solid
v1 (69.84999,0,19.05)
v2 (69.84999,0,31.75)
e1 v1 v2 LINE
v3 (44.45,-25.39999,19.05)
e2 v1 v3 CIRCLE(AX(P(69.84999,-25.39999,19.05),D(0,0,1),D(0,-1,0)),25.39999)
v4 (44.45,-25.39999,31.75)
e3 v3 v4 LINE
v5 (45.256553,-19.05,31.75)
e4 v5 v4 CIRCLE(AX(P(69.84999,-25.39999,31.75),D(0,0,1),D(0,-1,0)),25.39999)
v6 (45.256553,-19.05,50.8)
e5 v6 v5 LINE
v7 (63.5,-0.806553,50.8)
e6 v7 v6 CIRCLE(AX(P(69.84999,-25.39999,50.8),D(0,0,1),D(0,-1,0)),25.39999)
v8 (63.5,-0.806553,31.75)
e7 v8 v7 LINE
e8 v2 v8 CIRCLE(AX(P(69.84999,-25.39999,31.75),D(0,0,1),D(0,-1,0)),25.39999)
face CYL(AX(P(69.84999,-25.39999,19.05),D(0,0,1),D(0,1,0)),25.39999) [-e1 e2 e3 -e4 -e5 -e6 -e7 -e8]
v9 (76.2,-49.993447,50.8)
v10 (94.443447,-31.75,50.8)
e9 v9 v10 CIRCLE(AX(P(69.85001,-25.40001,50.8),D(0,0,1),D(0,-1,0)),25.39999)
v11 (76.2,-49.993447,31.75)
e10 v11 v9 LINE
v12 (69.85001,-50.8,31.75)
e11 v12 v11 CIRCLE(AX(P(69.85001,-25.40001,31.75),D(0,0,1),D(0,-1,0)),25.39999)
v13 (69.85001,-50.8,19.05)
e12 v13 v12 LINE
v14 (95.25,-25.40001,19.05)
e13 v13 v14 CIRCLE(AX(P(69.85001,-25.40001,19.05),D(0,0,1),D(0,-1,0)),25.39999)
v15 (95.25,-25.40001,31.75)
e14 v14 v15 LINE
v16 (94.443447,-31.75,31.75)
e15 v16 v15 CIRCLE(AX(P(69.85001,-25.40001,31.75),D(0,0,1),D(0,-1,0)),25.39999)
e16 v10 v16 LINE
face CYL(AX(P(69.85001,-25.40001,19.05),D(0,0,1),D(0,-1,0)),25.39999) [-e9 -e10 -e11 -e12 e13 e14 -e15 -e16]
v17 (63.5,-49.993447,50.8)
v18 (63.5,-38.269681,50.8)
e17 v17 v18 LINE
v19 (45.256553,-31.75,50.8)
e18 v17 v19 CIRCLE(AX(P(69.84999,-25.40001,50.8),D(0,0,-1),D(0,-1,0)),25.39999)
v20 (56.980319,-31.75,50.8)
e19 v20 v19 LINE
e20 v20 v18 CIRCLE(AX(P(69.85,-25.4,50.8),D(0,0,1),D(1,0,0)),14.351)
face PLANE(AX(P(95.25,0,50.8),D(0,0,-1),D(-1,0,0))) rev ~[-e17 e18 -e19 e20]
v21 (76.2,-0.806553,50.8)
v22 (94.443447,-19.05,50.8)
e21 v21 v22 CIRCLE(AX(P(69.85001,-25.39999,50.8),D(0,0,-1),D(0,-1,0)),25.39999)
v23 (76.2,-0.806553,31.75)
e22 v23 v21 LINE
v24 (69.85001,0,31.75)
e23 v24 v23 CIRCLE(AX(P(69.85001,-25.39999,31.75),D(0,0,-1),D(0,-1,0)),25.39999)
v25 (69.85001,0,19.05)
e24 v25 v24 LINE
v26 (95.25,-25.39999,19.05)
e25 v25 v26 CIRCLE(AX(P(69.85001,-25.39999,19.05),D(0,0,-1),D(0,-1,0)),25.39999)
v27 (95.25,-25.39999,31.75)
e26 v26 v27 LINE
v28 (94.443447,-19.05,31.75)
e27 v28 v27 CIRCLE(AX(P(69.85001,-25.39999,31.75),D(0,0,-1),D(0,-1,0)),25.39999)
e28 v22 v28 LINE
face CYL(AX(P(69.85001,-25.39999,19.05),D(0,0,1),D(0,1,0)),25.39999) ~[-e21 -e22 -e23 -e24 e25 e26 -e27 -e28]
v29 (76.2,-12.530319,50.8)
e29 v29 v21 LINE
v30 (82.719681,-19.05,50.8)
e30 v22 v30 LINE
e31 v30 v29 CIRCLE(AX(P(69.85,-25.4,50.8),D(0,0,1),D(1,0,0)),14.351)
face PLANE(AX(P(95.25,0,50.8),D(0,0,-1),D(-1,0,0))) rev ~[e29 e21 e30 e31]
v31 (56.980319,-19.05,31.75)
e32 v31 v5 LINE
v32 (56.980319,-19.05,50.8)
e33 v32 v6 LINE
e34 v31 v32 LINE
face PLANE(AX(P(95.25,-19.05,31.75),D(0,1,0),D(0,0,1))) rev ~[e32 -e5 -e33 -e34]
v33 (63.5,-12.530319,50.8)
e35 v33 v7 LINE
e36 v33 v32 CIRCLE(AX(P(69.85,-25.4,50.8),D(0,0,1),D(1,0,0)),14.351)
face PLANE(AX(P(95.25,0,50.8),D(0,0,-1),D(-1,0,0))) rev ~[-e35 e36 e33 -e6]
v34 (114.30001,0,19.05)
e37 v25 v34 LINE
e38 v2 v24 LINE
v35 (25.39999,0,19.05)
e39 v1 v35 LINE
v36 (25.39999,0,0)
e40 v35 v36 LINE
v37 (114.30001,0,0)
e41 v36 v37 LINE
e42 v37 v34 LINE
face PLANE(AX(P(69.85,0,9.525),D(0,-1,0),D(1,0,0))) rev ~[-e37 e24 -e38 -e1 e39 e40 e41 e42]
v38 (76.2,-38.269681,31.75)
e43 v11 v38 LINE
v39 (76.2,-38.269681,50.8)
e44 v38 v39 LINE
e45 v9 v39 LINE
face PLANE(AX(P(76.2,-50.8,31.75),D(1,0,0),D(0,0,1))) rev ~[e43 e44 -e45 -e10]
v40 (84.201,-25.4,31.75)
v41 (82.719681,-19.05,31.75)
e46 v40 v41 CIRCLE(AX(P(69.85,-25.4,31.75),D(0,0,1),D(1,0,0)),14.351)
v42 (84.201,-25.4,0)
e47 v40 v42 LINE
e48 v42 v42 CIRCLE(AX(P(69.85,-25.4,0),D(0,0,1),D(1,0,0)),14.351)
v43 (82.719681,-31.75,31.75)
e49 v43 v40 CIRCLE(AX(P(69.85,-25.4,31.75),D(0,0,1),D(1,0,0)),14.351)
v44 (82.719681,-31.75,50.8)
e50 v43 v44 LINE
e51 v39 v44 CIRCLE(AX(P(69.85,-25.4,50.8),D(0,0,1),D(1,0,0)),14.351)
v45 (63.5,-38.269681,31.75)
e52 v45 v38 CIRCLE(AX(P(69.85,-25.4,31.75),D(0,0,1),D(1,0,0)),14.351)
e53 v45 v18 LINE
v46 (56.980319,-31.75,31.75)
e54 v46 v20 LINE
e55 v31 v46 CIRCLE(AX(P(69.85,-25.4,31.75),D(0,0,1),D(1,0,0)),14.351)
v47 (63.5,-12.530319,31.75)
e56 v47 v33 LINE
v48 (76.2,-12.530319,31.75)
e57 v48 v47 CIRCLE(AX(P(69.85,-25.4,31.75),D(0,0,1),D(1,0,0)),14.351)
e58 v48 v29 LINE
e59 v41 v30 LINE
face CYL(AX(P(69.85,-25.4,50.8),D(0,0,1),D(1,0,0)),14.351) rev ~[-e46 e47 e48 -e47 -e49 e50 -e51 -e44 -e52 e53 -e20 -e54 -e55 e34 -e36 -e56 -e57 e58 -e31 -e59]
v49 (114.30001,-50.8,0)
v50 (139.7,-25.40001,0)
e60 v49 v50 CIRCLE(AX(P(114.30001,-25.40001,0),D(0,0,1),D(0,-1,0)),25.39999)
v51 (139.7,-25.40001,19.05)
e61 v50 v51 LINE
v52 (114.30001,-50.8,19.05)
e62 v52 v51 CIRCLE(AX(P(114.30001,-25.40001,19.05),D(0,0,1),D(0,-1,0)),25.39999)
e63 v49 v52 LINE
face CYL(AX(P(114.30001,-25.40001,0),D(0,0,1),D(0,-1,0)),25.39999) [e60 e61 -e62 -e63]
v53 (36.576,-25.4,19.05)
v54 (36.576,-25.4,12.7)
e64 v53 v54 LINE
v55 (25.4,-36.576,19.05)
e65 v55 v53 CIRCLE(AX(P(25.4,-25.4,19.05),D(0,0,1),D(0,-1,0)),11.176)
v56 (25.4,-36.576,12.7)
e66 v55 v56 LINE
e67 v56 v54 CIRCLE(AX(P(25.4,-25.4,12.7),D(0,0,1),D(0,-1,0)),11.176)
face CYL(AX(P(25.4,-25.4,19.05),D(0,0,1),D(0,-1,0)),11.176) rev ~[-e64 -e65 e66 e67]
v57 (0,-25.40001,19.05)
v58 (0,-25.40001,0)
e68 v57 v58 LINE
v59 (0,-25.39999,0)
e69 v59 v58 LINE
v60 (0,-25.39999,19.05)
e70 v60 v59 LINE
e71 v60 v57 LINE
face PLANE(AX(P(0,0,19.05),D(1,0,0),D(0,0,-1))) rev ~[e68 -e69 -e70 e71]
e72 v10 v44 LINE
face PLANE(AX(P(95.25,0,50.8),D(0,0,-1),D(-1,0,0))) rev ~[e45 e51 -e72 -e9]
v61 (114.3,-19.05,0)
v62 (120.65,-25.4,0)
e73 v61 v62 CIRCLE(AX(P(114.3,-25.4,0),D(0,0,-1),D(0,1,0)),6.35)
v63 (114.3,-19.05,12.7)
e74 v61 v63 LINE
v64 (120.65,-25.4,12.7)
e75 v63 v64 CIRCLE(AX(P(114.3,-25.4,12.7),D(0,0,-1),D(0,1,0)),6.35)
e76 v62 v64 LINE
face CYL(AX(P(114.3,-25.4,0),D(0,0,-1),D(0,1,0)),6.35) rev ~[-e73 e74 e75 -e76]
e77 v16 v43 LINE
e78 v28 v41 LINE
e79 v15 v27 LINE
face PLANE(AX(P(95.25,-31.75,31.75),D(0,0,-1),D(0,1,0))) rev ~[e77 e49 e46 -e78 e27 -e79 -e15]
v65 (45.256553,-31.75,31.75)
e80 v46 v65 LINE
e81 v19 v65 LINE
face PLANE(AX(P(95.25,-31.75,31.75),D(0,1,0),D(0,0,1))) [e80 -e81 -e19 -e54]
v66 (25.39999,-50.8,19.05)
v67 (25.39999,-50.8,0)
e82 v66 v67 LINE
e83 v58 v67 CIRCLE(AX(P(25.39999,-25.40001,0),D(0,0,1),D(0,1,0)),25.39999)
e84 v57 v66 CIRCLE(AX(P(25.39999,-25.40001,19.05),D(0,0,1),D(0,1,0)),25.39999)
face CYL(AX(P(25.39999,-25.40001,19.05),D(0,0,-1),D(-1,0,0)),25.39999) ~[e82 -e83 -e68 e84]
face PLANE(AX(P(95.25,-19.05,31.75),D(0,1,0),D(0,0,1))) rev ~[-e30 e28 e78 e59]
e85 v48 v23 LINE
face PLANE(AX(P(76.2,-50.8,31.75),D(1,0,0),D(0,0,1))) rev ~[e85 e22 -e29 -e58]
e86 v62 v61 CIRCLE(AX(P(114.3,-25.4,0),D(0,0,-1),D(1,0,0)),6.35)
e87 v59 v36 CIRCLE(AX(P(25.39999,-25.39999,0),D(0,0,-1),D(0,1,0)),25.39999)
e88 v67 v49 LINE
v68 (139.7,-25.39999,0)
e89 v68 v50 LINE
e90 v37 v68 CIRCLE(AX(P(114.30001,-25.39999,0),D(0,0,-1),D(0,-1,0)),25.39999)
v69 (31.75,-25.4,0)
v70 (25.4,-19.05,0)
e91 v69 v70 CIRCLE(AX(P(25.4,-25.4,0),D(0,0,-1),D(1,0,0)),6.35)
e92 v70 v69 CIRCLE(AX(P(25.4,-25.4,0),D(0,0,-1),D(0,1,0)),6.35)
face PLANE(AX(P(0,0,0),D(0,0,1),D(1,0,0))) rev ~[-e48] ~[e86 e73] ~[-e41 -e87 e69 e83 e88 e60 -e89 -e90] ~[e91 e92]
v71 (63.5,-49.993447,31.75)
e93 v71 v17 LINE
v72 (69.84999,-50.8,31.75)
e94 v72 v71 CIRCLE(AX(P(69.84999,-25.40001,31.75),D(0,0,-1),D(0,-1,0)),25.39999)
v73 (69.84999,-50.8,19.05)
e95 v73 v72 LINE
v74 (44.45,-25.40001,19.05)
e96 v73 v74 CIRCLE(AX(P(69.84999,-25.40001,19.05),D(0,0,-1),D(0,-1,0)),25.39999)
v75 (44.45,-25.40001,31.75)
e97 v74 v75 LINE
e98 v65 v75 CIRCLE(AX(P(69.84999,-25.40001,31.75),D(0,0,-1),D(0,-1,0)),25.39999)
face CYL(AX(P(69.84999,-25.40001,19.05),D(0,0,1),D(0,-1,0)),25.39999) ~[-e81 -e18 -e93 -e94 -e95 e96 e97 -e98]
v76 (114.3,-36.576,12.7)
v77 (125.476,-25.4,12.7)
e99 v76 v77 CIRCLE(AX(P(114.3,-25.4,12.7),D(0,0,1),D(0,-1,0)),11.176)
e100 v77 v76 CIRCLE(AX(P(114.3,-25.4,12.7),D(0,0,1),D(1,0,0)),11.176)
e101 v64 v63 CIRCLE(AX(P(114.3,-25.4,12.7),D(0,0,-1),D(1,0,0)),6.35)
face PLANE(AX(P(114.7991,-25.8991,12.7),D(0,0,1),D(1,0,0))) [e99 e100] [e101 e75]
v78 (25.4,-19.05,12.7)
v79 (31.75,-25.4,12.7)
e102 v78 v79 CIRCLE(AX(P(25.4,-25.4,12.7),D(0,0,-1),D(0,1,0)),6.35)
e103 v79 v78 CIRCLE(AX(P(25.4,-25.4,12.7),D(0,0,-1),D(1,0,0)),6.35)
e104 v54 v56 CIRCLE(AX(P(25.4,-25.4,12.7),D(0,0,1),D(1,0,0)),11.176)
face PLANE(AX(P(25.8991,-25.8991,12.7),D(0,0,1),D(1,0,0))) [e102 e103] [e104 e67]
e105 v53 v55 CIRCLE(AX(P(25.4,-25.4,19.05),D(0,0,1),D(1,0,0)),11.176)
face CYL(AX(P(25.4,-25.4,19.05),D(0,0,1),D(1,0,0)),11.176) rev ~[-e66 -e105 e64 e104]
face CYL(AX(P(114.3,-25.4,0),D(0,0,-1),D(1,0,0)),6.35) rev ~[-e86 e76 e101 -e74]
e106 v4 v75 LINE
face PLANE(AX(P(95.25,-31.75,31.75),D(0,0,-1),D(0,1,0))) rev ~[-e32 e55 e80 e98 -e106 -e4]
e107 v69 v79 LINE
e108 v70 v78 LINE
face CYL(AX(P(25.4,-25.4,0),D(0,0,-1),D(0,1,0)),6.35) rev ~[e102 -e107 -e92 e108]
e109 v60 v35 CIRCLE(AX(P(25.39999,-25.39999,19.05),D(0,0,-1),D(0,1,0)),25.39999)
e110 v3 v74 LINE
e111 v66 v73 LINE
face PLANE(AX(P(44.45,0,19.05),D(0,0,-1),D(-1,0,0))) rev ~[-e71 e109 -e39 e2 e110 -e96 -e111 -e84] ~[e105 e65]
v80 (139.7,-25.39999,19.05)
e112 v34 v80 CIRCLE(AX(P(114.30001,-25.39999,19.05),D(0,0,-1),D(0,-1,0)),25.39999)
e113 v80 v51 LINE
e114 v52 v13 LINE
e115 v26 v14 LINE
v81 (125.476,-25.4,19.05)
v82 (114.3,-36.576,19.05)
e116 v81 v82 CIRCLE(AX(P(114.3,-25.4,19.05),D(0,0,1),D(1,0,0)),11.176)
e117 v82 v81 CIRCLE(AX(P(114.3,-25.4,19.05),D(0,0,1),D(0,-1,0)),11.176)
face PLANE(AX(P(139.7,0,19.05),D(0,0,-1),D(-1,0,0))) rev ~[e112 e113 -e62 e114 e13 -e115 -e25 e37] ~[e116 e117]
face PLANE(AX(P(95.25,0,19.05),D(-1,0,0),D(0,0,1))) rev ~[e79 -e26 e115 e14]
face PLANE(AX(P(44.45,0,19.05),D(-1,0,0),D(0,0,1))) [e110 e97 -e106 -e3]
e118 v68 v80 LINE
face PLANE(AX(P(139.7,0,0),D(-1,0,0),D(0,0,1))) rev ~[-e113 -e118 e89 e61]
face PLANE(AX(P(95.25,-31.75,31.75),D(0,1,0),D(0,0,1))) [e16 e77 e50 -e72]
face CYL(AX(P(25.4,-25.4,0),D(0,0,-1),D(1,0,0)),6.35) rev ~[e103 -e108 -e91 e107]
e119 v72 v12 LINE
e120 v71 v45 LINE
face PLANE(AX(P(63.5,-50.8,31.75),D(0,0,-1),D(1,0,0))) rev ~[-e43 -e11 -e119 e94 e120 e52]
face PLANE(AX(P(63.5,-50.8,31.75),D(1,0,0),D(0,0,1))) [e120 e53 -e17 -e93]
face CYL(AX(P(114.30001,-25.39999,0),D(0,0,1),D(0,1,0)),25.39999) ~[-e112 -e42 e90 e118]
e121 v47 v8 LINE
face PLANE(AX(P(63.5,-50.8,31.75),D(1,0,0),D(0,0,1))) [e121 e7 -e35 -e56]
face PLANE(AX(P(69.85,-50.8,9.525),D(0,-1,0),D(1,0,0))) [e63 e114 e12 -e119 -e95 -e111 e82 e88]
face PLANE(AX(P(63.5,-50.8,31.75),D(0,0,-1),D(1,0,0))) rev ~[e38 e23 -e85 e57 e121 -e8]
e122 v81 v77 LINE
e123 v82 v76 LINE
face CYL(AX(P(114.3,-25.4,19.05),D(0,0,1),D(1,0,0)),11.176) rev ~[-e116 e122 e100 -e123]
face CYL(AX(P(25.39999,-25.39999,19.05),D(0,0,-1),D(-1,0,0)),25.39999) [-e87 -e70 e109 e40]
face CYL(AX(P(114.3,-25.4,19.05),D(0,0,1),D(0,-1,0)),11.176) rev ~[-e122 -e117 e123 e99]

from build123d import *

# Parameters (mm, degrees)
F0_W      = 25.4
F0_H      = 31.75
F1_DEPTH  = 50.8
F2_R      = 14.351
F3_DEPTH  = 101.6
F4_W      = 12.7
F4_H      = 19.05
F5_DEPTH  = 254
F6_W      = 12.7
F6_H      = 19.05
F7_DEPTH  = 127
F9_DEPTH  = 6.35
F11_DEPTH = 6.35
F13_DEPTH = 50.8
F15_DEPTH = 558.8
F16_R     = 25.39999


# Not quite as in the source:
# - a fillet or chamfer is up to 0.001 mm smaller than in the source, because OpenCascade refuses the exact size


with BuildPart() as f1:
    # F0 (on Front) → F1 (new body)
    with BuildSketch(Plane.XZ):
        Polygon((0, 19.05), (0, 0), (139.7, 0), (139.7, 19.05), (95.25, 19.05), (69.85, 19.05), (44.45, 19.05), align=None)
        with Locations((57.15, 34.925)):
            Rectangle(F0_W, F0_H)
        with Locations((82.55, 34.925)):
            Rectangle(F0_W, F0_H)
    extrude(amount=F1_DEPTH)

    # F2 (on face) → F3 (cut)
    with BuildSketch(Plane.XY.offset(50.8)):
        with Locations((69.85, -25.4)):
            Circle(F2_R)
    extrude(amount=-F3_DEPTH, mode=Mode.SUBTRACT)

    # F4 (on face) → F5 (cut)
    with BuildSketch(Plane.XZ.offset(50.8)):
        with Locations((69.85, 41.275)):
            Rectangle(F4_W, F4_H)
    extrude(amount=-F5_DEPTH, mode=Mode.SUBTRACT)

    # F6 (on face) → F7 (cut)
    with BuildSketch(Plane.YZ.offset(95.25)):
        with Locations((-25.4, 41.275)):
            Rectangle(F6_W, F6_H)
    extrude(amount=-F7_DEPTH, mode=Mode.SUBTRACT)

    # F8 (on face) → F9 (cut)
    with BuildSketch(Plane.XY.offset(19.05)):
        with BuildLine():
            ThreePointArc((114.3, -36.576), (122.2026253865, -33.3026253865), (125.476, -25.4))
            ThreePointArc((125.476, -25.4), (106.3973746135, -17.4973746135), (114.3, -36.576))
        make_face()
    extrude(amount=-F9_DEPTH, mode=Mode.SUBTRACT)

    # F10 (on face) → F11 (cut)
    with BuildSketch(Plane.XY.offset(19.05)):
        with BuildLine():
            ThreePointArc((25.4, -36.576), (33.3026253865, -33.3026253865), (36.576, -25.4))
            ThreePointArc((36.576, -25.4), (17.4973746135, -17.4973746135), (25.4, -36.576))
        make_face()
    extrude(amount=-F11_DEPTH, mode=Mode.SUBTRACT)

    # F12 (on face) → F13 (cut)
    with BuildSketch(Plane(origin=(0, 0, 0), x_dir=(1, 0, 0), z_dir=(0, 0, -1))):
        with BuildLine():
            ThreePointArc((25.4, 19.05), (29.8901280605, 20.9098719395), (31.75, 25.4))
            ThreePointArc((31.75, 25.4), (20.9098719395, 29.8901280605), (25.4, 19.05))
        make_face()
    extrude(amount=-F13_DEPTH, mode=Mode.SUBTRACT)

    # F14 (on face) → F15 (cut)
    with BuildSketch(Plane(origin=(0, 0, 0), x_dir=(1, 0, 0), z_dir=(0, 0, -1))):
        with BuildLine():
            ThreePointArc((114.3, 19.05), (118.7901280605, 20.9098719395), (120.65, 25.4))
            ThreePointArc((120.65, 25.4), (109.8098719395, 29.8901280605), (114.3, 19.05))
        make_face()
    extrude(amount=-F15_DEPTH, mode=Mode.SUBTRACT)

    # F16 (radius 25.4 in the source; OpenCascade refuses exactly that, so slightly less here)
    f16_edges = [f1.edges().sort_by_distance(p)[0] for p in [
        (95.25, 0, 34.925),
        (95.25, -50.8, 34.925),
        (44.45, 0, 34.925),
        (44.45, -50.8, 34.925),
        (0, -50.8, 9.525),
        (0, 0, 9.525),
        (139.7, -50.8, 9.525),
        (139.7, 0, 9.525),
    ]]
    fillet(f16_edges, radius=F16_R)


solid = f1.part
